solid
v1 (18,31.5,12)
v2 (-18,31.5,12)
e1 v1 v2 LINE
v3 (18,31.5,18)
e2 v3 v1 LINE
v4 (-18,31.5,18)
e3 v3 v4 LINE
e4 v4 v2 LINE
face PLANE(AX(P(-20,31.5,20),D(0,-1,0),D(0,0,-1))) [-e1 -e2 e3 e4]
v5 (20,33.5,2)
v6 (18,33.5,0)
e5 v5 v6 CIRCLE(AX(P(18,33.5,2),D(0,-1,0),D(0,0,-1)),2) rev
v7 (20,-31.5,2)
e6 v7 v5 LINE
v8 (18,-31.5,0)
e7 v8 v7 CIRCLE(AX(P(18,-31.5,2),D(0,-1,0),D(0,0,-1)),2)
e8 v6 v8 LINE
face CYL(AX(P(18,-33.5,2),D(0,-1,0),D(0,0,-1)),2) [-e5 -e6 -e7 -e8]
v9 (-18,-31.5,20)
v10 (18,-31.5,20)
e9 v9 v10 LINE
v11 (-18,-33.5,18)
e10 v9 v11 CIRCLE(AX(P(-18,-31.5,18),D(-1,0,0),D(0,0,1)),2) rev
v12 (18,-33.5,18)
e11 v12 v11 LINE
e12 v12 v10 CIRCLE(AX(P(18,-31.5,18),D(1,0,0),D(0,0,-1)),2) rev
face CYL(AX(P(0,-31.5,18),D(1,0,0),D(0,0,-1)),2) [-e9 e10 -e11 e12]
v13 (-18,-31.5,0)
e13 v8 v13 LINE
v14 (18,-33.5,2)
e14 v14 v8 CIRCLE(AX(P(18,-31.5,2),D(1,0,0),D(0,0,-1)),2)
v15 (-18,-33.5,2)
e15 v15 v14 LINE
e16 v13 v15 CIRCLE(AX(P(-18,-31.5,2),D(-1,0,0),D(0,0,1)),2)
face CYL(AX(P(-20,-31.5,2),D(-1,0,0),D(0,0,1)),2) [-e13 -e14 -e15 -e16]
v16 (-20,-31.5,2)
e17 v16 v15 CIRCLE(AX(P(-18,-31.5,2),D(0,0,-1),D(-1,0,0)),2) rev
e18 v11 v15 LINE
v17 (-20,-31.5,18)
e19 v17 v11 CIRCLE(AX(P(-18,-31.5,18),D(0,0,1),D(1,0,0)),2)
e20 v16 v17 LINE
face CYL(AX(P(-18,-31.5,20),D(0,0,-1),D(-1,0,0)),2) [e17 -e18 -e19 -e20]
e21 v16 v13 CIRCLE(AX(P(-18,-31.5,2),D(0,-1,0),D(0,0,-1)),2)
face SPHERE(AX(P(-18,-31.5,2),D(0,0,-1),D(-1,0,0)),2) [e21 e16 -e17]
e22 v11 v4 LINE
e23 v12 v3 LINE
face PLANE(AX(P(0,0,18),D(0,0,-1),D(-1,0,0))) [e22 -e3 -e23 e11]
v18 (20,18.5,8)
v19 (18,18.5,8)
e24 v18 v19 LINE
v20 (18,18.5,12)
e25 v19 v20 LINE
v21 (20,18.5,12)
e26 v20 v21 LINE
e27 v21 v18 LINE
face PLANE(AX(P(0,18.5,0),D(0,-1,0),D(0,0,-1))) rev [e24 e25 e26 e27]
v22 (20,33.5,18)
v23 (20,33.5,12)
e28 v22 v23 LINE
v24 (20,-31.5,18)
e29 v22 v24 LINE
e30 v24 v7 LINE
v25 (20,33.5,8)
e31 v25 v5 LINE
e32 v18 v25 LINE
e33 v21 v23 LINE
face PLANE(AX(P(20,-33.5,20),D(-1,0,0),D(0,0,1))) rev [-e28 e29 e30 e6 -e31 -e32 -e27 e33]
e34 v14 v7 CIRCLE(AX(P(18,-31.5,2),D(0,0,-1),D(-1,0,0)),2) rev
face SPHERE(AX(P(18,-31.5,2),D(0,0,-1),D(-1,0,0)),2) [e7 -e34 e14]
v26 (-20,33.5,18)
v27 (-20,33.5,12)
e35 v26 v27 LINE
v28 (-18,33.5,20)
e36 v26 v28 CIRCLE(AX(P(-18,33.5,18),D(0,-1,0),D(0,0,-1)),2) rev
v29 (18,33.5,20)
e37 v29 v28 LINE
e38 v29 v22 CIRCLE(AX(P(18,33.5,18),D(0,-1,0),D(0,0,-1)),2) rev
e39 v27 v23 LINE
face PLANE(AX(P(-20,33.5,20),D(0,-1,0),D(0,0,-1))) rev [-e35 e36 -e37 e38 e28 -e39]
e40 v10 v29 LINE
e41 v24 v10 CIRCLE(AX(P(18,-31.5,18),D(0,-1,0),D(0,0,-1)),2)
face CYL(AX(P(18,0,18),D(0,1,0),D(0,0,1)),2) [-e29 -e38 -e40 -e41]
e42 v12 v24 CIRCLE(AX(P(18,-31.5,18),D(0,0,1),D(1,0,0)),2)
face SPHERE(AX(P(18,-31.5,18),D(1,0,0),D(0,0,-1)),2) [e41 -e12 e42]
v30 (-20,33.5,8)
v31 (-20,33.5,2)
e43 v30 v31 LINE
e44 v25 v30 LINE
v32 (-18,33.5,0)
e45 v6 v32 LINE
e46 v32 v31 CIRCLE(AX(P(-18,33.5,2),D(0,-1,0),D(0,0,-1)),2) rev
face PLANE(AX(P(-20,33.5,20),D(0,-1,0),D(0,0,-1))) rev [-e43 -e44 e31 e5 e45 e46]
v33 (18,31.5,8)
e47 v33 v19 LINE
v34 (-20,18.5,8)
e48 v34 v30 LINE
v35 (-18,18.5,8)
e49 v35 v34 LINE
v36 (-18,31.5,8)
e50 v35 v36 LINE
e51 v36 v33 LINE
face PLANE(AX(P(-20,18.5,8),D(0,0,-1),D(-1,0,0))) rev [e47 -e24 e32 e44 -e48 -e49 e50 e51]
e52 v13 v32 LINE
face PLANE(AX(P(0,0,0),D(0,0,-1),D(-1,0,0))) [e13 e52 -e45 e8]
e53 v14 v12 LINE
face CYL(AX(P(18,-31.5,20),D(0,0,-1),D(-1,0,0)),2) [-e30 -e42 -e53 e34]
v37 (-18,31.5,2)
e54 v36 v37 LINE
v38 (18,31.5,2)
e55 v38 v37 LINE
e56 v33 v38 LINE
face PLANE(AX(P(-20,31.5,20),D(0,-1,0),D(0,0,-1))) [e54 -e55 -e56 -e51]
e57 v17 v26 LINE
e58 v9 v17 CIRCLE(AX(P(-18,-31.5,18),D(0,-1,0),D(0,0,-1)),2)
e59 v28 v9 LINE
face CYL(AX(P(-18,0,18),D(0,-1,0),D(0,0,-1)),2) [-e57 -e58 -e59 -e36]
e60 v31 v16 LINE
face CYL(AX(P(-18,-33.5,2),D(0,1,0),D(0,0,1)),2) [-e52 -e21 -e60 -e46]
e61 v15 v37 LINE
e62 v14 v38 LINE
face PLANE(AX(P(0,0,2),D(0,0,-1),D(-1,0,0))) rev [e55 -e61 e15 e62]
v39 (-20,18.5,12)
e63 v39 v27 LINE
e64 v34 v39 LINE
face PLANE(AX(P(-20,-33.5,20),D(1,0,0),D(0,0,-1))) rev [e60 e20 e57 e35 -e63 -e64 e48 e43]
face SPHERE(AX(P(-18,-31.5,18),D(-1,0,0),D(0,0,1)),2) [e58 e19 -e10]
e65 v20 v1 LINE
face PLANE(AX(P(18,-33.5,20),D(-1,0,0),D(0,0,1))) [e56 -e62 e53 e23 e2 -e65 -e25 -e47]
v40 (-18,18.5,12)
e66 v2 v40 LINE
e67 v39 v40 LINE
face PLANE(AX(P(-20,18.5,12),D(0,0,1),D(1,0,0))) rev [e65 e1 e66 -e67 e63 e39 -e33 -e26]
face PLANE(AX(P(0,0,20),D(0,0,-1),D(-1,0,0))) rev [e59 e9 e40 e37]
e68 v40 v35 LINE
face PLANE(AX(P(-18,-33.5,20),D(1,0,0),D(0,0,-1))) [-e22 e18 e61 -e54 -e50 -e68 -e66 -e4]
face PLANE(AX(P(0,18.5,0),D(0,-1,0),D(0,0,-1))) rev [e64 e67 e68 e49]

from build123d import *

# Parameters (mm, degrees)
CROQUIS1_W              = 40
CROQUIS1_H              = 67
SALIENTE_EXTRUIR1_DEPTH = 20
REDONDEO1_R             = 2
VACIADO1_START          = -18
VACIADO1_OUTLINE_W      = 65
VACIADO1_OUTLINE_H      = 16
VACIADO1_DEPTH          = 36
CROQUIS2_W              = 40
CROQUIS2_H              = 4
CORTAR_EXTRUIR1_DEPTH   = 15


# Read off the part's stored shape, not the designer's step: Vaciado1
with BuildPart() as part:
    # Croquis1 → Saliente-Extruir1 (new body)
    with BuildSketch(Plane.XY):
        Rectangle(CROQUIS1_W, CROQUIS1_H)
    extrude(amount=SALIENTE_EXTRUIR1_DEPTH)

    # Redondeo1
    redondeo1_edges = [part.edges().sort_by_distance(p)[0] for p in [
        (-20, 0, 20),
        (0, -33.5, 20),
        (20, 0, 20),
        (0, -33.5, 0),
        (-20, 0, 0),
        (20, 0, 0),
        (20, -33.5, 10),
        (-20, -33.5, 10),
    ]]
    fillet(redondeo1_edges, radius=REDONDEO1_R)

    # Vaciado1 outline → Vaciado1 (cut)
    with BuildSketch(Plane.YZ.offset(VACIADO1_START)):
        with Locations((-1, 10)):
            Rectangle(VACIADO1_OUTLINE_W, VACIADO1_OUTLINE_H)
    extrude(amount=VACIADO1_DEPTH, mode=Mode.SUBTRACT)

    # Croquis2 → Cortar-Extruir1 (cut)
    with BuildSketch(Plane(origin=(0, 33.5, 0), x_dir=(1, 0, 0), z_dir=(0, 1, 0))):
        with Locations((0, -10)):
            Rectangle(CROQUIS2_W, CROQUIS2_H)
    extrude(amount=-CORTAR_EXTRUIR1_DEPTH, mode=Mode.SUBTRACT)


solid = part.part
